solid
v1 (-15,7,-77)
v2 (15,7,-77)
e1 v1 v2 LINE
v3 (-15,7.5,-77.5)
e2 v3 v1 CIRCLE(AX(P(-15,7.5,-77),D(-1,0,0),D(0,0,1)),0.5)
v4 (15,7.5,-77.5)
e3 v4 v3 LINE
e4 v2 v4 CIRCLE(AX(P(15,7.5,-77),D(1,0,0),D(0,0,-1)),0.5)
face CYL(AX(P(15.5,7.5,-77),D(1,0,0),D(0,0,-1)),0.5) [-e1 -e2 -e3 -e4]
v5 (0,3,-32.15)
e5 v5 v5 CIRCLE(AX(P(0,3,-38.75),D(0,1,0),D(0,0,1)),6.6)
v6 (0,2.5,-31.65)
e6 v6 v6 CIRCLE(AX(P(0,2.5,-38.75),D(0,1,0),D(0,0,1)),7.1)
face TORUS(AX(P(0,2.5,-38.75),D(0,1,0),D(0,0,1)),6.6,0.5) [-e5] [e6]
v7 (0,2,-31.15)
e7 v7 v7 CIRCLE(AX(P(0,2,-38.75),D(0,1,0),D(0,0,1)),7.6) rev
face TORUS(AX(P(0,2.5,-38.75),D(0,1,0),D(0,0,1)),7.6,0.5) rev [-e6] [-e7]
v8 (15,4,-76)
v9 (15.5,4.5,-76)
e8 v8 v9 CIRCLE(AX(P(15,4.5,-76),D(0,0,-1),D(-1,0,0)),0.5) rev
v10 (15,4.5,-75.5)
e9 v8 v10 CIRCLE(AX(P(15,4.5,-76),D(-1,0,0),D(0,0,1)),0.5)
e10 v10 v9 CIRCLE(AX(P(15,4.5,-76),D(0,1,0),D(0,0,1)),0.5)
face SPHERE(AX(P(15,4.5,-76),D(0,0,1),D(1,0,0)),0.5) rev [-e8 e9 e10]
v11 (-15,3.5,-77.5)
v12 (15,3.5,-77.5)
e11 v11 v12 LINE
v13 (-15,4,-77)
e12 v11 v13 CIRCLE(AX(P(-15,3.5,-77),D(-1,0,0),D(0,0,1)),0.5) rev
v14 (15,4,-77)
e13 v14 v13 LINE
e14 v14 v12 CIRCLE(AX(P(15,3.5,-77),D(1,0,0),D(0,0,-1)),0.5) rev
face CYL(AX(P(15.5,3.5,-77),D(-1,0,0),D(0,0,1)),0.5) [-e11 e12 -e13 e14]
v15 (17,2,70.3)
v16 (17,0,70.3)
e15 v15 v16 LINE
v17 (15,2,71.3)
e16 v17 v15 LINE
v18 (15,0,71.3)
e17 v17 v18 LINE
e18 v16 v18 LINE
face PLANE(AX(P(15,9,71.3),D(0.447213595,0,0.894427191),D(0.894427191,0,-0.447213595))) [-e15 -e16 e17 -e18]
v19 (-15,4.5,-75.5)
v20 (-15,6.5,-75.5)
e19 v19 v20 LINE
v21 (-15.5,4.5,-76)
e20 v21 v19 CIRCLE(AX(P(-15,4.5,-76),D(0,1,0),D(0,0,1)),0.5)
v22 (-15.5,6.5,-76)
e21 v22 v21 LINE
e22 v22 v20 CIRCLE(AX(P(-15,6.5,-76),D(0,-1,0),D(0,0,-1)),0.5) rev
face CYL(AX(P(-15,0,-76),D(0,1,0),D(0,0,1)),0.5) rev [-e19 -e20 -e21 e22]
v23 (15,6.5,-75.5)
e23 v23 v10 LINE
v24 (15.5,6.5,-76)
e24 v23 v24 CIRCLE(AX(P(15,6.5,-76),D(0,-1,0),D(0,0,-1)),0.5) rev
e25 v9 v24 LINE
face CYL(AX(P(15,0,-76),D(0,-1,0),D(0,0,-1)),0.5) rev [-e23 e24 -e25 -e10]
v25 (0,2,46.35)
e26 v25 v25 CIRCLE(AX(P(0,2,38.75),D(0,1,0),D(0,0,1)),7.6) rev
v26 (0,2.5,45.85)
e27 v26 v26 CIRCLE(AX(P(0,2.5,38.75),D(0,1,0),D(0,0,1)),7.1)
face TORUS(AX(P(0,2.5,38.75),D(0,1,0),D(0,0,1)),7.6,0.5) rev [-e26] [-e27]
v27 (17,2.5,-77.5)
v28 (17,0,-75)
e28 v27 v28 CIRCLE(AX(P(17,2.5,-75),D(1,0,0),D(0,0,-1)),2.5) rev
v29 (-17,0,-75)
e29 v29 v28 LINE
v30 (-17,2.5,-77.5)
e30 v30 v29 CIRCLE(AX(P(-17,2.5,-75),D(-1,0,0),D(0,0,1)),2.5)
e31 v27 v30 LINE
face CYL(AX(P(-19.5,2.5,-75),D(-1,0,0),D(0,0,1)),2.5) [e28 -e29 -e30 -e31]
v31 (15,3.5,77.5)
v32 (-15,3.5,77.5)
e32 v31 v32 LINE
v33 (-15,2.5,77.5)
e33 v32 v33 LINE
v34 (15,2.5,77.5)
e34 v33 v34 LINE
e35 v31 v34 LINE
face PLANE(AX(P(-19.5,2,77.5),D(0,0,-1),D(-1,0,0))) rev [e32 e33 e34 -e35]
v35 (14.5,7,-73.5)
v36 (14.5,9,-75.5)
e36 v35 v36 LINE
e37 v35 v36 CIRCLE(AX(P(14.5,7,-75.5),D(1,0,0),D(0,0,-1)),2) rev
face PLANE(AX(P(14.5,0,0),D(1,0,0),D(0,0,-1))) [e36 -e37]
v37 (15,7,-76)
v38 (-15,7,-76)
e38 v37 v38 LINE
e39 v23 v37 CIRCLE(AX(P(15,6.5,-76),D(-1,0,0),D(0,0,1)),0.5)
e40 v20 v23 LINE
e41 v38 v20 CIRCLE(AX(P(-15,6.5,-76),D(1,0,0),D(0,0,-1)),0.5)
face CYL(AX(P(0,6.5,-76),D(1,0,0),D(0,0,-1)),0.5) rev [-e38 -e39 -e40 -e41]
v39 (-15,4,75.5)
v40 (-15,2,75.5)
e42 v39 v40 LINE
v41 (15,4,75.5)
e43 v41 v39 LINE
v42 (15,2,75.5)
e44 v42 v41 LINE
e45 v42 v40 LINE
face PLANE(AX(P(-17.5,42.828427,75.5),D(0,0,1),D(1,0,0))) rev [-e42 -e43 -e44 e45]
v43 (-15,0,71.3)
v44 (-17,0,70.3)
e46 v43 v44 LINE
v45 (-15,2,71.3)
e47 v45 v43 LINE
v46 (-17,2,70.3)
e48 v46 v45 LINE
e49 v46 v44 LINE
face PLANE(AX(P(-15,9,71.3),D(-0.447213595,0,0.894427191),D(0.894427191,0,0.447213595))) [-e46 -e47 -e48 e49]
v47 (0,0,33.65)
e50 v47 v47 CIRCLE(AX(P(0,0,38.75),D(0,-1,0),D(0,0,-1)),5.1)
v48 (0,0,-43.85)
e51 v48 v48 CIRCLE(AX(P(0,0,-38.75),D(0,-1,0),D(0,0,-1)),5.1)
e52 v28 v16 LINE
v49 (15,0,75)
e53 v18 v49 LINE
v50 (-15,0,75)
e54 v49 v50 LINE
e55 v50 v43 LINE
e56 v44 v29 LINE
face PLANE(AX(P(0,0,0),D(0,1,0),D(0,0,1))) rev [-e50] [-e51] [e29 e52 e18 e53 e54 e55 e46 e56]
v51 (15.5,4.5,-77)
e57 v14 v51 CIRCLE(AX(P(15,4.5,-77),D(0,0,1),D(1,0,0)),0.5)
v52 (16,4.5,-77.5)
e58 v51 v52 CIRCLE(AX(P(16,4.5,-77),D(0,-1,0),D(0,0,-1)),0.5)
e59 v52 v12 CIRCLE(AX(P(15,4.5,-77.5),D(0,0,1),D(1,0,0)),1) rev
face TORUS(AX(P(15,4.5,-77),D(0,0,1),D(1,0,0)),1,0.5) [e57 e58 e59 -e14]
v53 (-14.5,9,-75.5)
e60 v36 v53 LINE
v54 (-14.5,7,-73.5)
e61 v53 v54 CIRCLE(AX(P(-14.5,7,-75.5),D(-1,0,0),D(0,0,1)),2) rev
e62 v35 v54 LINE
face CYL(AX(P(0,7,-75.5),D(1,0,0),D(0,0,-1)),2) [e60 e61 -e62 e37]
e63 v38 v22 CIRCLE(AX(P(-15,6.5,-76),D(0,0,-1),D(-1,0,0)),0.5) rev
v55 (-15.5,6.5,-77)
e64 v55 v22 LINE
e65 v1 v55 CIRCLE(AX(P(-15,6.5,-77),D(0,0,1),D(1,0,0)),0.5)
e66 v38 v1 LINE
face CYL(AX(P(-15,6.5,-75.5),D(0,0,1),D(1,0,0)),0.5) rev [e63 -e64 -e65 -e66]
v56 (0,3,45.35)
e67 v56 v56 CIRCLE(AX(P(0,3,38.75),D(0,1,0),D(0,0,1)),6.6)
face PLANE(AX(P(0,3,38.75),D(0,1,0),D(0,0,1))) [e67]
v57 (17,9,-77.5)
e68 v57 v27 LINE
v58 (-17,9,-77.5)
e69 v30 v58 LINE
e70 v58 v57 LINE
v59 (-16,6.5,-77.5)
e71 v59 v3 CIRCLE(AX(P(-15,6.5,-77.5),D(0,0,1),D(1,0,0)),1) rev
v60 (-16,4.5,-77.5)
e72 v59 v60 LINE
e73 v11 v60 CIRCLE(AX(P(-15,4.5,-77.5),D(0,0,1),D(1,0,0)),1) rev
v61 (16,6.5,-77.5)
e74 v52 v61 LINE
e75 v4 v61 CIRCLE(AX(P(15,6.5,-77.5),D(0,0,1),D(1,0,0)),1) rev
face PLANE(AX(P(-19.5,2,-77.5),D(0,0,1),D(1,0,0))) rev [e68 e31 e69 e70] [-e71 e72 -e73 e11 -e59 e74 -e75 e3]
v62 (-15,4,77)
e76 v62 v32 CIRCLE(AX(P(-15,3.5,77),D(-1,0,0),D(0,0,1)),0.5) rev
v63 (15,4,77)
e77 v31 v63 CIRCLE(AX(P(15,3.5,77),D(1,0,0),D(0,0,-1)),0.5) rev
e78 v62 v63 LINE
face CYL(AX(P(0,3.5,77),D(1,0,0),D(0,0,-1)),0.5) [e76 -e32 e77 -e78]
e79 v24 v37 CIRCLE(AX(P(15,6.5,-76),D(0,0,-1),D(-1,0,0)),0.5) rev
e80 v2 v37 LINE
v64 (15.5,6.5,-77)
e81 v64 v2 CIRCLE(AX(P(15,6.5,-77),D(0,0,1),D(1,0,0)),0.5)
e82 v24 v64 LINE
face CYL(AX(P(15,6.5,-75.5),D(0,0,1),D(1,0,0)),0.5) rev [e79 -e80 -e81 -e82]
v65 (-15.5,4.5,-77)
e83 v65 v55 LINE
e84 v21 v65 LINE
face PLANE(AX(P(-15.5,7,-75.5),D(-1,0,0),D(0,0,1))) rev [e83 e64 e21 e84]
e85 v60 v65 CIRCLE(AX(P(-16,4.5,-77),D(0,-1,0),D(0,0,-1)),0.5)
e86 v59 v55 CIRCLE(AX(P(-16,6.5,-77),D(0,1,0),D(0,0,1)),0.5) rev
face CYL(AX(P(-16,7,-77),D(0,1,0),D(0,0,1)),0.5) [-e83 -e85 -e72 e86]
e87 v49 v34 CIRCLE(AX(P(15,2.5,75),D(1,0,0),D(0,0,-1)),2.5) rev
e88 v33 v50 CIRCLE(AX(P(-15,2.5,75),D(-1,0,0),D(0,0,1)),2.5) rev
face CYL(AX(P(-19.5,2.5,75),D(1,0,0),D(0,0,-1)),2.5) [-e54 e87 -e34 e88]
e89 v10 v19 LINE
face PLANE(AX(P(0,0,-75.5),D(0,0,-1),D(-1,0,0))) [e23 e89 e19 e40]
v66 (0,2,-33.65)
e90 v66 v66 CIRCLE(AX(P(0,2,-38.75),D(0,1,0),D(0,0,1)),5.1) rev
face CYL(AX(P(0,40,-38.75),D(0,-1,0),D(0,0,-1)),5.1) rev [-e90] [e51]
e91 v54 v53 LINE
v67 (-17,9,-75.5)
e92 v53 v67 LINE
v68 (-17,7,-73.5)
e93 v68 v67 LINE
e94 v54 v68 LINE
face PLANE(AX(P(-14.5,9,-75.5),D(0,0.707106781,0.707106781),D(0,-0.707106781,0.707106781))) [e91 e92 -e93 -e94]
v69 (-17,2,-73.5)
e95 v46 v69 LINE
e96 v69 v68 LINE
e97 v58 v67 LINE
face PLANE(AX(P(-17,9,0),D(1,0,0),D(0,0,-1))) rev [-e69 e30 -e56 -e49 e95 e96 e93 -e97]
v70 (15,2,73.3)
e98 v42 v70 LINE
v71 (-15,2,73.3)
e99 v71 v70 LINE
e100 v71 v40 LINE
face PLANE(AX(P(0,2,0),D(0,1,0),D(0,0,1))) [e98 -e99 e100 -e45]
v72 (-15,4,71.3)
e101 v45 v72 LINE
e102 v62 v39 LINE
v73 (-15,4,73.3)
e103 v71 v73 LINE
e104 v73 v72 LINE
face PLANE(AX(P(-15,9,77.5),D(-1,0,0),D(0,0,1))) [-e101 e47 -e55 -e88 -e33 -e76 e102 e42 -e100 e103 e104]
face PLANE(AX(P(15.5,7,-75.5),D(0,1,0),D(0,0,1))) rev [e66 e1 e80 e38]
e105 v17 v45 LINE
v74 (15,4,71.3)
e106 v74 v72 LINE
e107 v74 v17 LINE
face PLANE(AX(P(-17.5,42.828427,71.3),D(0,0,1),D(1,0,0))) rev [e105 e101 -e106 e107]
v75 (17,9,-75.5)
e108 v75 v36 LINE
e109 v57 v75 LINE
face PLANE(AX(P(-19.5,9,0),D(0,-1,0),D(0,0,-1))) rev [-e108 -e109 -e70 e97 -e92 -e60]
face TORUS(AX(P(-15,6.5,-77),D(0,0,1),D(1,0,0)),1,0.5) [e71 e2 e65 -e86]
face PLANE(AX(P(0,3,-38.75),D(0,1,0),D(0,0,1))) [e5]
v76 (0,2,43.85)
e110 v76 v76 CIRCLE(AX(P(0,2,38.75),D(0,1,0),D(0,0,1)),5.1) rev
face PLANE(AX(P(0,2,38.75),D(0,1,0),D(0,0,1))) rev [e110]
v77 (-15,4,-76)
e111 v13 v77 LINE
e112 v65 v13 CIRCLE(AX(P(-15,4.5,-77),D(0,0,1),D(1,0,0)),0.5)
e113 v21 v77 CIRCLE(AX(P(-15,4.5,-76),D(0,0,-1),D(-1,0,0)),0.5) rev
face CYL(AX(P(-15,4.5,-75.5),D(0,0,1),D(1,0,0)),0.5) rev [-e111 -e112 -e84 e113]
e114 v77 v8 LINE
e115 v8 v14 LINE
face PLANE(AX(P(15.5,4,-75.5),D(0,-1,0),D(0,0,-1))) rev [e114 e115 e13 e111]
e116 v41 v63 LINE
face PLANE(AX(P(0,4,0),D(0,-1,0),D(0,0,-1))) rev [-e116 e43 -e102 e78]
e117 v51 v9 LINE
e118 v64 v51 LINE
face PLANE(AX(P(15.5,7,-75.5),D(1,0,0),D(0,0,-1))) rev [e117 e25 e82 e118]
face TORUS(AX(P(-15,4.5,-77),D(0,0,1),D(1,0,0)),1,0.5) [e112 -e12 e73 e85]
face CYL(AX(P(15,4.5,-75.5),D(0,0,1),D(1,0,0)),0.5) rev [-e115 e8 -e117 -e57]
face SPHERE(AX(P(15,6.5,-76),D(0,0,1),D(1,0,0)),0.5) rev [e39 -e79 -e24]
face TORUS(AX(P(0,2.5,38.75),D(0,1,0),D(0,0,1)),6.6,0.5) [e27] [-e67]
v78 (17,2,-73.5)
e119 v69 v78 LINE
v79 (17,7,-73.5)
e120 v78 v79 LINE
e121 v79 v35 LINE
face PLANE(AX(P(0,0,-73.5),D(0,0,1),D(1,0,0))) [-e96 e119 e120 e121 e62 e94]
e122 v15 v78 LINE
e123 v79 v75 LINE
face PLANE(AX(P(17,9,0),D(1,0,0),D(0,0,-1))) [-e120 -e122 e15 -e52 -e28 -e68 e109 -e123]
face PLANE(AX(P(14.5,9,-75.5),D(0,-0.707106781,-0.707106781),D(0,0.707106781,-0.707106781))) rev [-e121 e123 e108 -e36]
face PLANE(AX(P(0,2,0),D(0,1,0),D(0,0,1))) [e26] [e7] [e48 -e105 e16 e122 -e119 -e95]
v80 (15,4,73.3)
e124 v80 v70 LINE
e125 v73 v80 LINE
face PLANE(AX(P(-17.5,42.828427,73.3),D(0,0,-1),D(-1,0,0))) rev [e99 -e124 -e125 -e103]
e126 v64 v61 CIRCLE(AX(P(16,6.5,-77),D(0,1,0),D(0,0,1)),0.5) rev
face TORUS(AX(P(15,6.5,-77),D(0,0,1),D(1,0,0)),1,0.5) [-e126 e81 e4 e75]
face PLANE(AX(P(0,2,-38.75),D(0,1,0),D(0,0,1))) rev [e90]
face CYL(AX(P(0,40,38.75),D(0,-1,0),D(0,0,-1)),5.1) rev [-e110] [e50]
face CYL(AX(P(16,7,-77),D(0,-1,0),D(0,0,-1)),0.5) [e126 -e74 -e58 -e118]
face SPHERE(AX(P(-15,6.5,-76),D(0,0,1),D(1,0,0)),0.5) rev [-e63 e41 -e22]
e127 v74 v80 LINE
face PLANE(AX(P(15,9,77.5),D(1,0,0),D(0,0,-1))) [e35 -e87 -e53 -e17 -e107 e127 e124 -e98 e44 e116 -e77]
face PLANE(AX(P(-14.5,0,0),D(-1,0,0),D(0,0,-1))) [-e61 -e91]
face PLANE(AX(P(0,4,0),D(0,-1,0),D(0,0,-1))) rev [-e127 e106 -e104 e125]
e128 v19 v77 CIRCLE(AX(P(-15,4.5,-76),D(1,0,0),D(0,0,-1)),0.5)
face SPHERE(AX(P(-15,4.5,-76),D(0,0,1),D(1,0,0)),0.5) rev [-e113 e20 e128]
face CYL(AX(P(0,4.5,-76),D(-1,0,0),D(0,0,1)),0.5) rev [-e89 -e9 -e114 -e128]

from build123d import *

# Parameters (mm, degrees)
SKETCH1_W                       = 39
SKETCH1_H                       = 155
BOSS_EXTRUDE1_DEPTH             = 2
BOSS_EXTRUDE2_DEPTH             = 38
SKETCH3_W                       = 2
SKETCH3_H                       = 2
BOSS_EXTRUDE3_DEPTH             = 38
SKETCH4_W                       = 2
SKETCH4_H                       = 2
BOSS_EXTRUDE4_DEPTH             = 151
SKETCH6_W                       = 35
SKETCH6_H                       = 2.2
CUT_EXTRUDE1_DEPTH              = 160.340045186
SKETCH7_W                       = 35
SKETCH7_H                       = 2.2
CUT_EXTRUDE2_DEPTH              = 89.490112442
SKETCH5_W                       = 31
SKETCH5_H                       = 2
BOSS_EXTRUDE5_DEPTH             = 2
BOSS_EXTRUDE6_REACH             = 91.367
SKETCH8_W                       = 2
SKETCH8_H                       = 2
BOSS_EXTRUDE6_DIRECTION_2_REACH = 91.367
SKETCH10_W                      = 2
SKETCH10_H                      = 2.2
SKETCH10_W_2                    = 2.2
SKETCH10_H_2                    = 2
BOSS_EXTRUDE8_DEPTH             = 2
SKETCH11_W                      = 2
SKETCH11_H                      = 2.2
SKETCH11_W_2                    = 2.2
SKETCH11_H_2                    = 2
BOSS_EXTRUDE9_DEPTH             = 2
FILLET2_R                       = 2.5
SKETCH14_W                      = 36.5
SKETCH14_H                      = 7.75
BOSS_EXTRUDE10_DEPTH            = 2
SKETCH13_W                      = 31
SKETCH13_H                      = 3
CUT_EXTRUDE4_DEPTH              = 2
FILLET3_R                       = 2
FILLET4_R                       = 0.5
SKETCH15_R                      = 5.1
CUT_EXTRUDE5_DEPTH              = 90.367219941
SKETCH16_R                      = 7.1
BOSS_EXTRUDE11_DEPTH            = 1
FILLET5_R                       = 0.5
CUT_EXTRUDE3_DEPTH              = 160.340045186
FILLET6_R                       = 0.4
FILLET7_R                       = 0.5
CUT_EXTRUDE8_DEPTH              = 90.367220028
CUT_EXTRUDE8_DEPTH_BACK         = 90.367220028
CUT_EXTRUDE11_DEPTH             = 81.420768473
CUT_EXTRUDE12_DEPTH             = 80.851424566
CUT_EXTRUDE13_DEPTH             = 2.5


with BuildPart() as part:
    # Sketch1 → Boss-Extrude1 (new body)
    with BuildSketch(Plane(origin=(0, 0, 0), x_dir=(1, 0, 0), z_dir=(0, 1, 0))):
        Rectangle(SKETCH1_W, SKETCH1_H)
    extrude(amount=BOSS_EXTRUDE1_DEPTH)

    # Sketch2 → Boss-Extrude2 (add)
    with BuildSketch(Plane(origin=(0, 2, 0), x_dir=(1, 0, 0), z_dir=(0, 1, 0))):
        Polygon((-17.5, -77.5), (-17.5, -75.5), (-17.5, 75.5), (17.5, 75.5), (17.5, -75.5), (17.5, -77.5), (19.5, -77.5), (19.5, 77.5), (-19.5, 77.5), (-19.5, -77.5), align=None)
    extrude(amount=BOSS_EXTRUDE2_DEPTH)

    # Sketch3 → Boss-Extrude3 (add)
    with BuildSketch(Plane(origin=(0, 2, 0), x_dir=(1, 0, 0), z_dir=(0, 1, 0))):
        with Locations((-16.5, -76.5)):
            Rectangle(SKETCH3_W, SKETCH3_H)
        with Locations((-16.5, -72.3)):
            Rectangle(SKETCH3_W, SKETCH3_H)
        with Locations((16.5, -76.5)):
            Rectangle(SKETCH3_W, SKETCH3_H)
        with Locations((16.5, -72.3)):
            Rectangle(SKETCH3_W, SKETCH3_H)
    extrude(amount=BOSS_EXTRUDE3_DEPTH)

    # Sketch4 → Boss-Extrude4 (add)
    with BuildSketch(Plane.XY.offset(-75.5)):
        with Locations((-16.5, 39)):
            Rectangle(SKETCH4_W, SKETCH4_H)
        Polygon((-15.5, 33.8), (-17.5, 31.8), (-17.5, 35.8), (-15.5, 35.8), align=None)
        Polygon((15.5, 35.8), (17.5, 35.8), (17.5, 31.8), (15.5, 33.8), align=None)
        with Locations((16.5, 39)):
            Rectangle(SKETCH4_W, SKETCH4_H)
    extrude(amount=BOSS_EXTRUDE4_DEPTH)

    # Sketch6 → Cut-Extrude1 (cut, through all)
    with BuildSketch(Plane.XY.offset(-75.5)):
        with Locations((0, 36.9)):
            Rectangle(SKETCH6_W, SKETCH6_H)
    extrude(amount=CUT_EXTRUDE1_DEPTH, mode=Mode.SUBTRACT)

    # Sketch7 → Cut-Extrude2 (cut, through all)
    with BuildSketch(Plane(origin=(0, 2, 0), x_dir=(1, 0, 0), z_dir=(0, 1, 0))):
        with Locations((0, -74.4)):
            Rectangle(SKETCH7_W, SKETCH7_H)
    extrude(amount=CUT_EXTRUDE2_DEPTH, mode=Mode.SUBTRACT)

    # Sketch5 → Boss-Extrude5 (add)
    with BuildSketch(Plane(origin=(0, 2, 0), x_dir=(1, 0, 0), z_dir=(0, 1, 0))):
        with Locations((0, -76.5)):
            Rectangle(SKETCH5_W, SKETCH5_H)
        with Locations((0, -72.3)):
            Rectangle(SKETCH5_W, SKETCH5_H)
    extrude(amount=BOSS_EXTRUDE5_DEPTH)

    # Boss-Extrude6: up to this face of the body (flat: up to its plane)
    boss_extrude6_end = Plane(part.part.faces().sort_by_distance((17.5, 16.9, -2.1))[0])
    # Sketch8 → Boss-Extrude6 (add, up to the picked face)
    with BuildSketch(Plane(origin=(0, 0, 0), x_dir=(0, 0, -1), z_dir=(1, 0, 0)), mode=Mode.PRIVATE) as boss_extrude6_sk1:
        with Locations((74.5, 39)):
            Rectangle(SKETCH8_W, SKETCH8_H)
    boss_extrude6_tool1 = split(extrude(boss_extrude6_sk1.sketch, amount=BOSS_EXTRUDE6_REACH, mode=Mode.PRIVATE), bisect_by=boss_extrude6_end, keep=Keep.BOTH, mode=Mode.PRIVATE)
    # Sketch8 → Boss-Extrude6 (add, up to the picked face)
    with BuildSketch(Plane(origin=(0, 0, 0), x_dir=(0, 0, -1), z_dir=(1, 0, 0)), mode=Mode.PRIVATE) as boss_extrude6_sk2:
        Polygon((75.5, 35.8), (73.5, 35.8), (73.5, 33.8), (75.5, 31.8), align=None)
    boss_extrude6_tool2 = split(extrude(boss_extrude6_sk2.sketch, amount=BOSS_EXTRUDE6_REACH, mode=Mode.PRIVATE), bisect_by=boss_extrude6_end, keep=Keep.BOTH, mode=Mode.PRIVATE)
    add(boss_extrude6_tool1.solids().sort_by(Axis((0, 39, -74.5), (1, 0, 0)))[0])
    add(boss_extrude6_tool2.solids().sort_by(Axis((0, 34.244444, -74.611111), (1, 0, 0)))[0])

    # Boss-Extrude6 direction 2: up to this face of the body (flat: up to its plane)
    boss_extrude6_direction_2_end = Plane(part.part.faces().sort_by_distance((-17.5, 16.9, -2.1))[0])
    # Sketch8 → Boss-Extrude6 direction 2 (add, up to the picked face)
    with BuildSketch(Plane(origin=(0, 0, 0), x_dir=(0, 0, -1), z_dir=(1, 0, 0)), mode=Mode.PRIVATE) as boss_extrude6_direction_2_sk1:
        with Locations((74.5, 39)):
            Rectangle(SKETCH8_W, SKETCH8_H)
    boss_extrude6_direction_2_tool1 = split(extrude(boss_extrude6_direction_2_sk1.sketch, amount=-BOSS_EXTRUDE6_DIRECTION_2_REACH, mode=Mode.PRIVATE), bisect_by=boss_extrude6_direction_2_end, keep=Keep.BOTH, mode=Mode.PRIVATE)
    # Sketch8 → Boss-Extrude6 direction 2 (add, up to the picked face)
    with BuildSketch(Plane(origin=(0, 0, 0), x_dir=(0, 0, -1), z_dir=(1, 0, 0)), mode=Mode.PRIVATE) as boss_extrude6_direction_2_sk2:
        Polygon((75.5, 35.8), (73.5, 35.8), (73.5, 33.8), (75.5, 31.8), align=None)
    boss_extrude6_direction_2_tool2 = split(extrude(boss_extrude6_direction_2_sk2.sketch, amount=-BOSS_EXTRUDE6_DIRECTION_2_REACH, mode=Mode.PRIVATE), bisect_by=boss_extrude6_direction_2_end, keep=Keep.BOTH, mode=Mode.PRIVATE)
    add(boss_extrude6_direction_2_tool1.solids().sort_by(Axis((0, 39, -74.5), (-1, 0, 0)))[0])
    add(boss_extrude6_direction_2_tool2.solids().sort_by(Axis((0, 34.244444, -74.611111), (-1, 0, 0)))[0])

    # Sketch10 → Boss-Extrude8 (add)
    with BuildSketch(Plane(origin=(-17.5, 0, 0), x_dir=(0, 0, -1), z_dir=(1, 0, 0))):
        with Locations((-76.5, 36.9)):
            Rectangle(SKETCH10_W, SKETCH10_H)
        with Locations((-74.4, 39)):
            Rectangle(SKETCH10_W_2, SKETCH10_H_2)
    extrude(amount=BOSS_EXTRUDE8_DEPTH)

    # Sketch11 → Boss-Extrude9 (add)
    with BuildSketch(Plane.ZY.offset(-17.5)):
        with Locations((76.5, 36.9)):
            Rectangle(SKETCH11_W, SKETCH11_H)
        with Locations((74.4, 39)):
            Rectangle(SKETCH11_W_2, SKETCH11_H_2)
    extrude(amount=BOSS_EXTRUDE9_DEPTH)

    # Fillet2
    fillet2_edges = [part.edges().sort_by_distance(p)[0] for p in [
        (-17.5, 16.9, 71.3),
        (17.5, 16.9, 71.3),
        (19.5, 20, 77.5),
        (-19.5, 20, 77.5),
        (-19.5, 20, -77.5),
        (-17.5, 16.9, -75.5),
        (17.5, 16.9, -75.5),
        (19.5, 20, -77.5),
        (19.5, 40, 0),
        (-19.5, 40, 0),
        (19.5, 0, 0),
        (-19.5, 0, 0),
        (0, 40, -77.5),
        (0, 0, 77.5),
        (0, 0, -77.5),
        (-17.5, 40, 77.5),
        (17.5, 40, 77.5),
    ]]
    fillet(fillet2_edges, radius=FILLET2_R)

    # Sketch14 → Boss-Extrude10 (add)
    with BuildSketch(Plane.XY.offset(-75.5)):
        with Locations((0, 5.125)):
            Rectangle(SKETCH14_W, SKETCH14_H)
    extrude(amount=BOSS_EXTRUDE10_DEPTH)

    # Sketch13 → Cut-Extrude4 (cut)
    with BuildSketch(Plane(origin=(0, 0, -77.5), x_dir=(-1, 0, 0), z_dir=(0, 0, -1))):
        with Locations((0, 5.5)):
            Rectangle(SKETCH13_W, SKETCH13_H)
    extrude(amount=-CUT_EXTRUDE4_DEPTH, mode=Mode.SUBTRACT)

    # Fillet3
    fillet3_edges = [part.edges().sort_by_distance(p)[0] for p in [
        (0, 9, -73.5),
    ]]
    fillet(fillet3_edges, radius=FILLET3_R - 0.0001)  # a hair under: the kernel refuses the full size

    # Fillet4
    fillet4_edges = [part.edges().sort_by_distance(p)[0] for p in [
        (15.5, 5.5, -75.5),
        (15.5, 4, -76.5),
        (0, 7, -75.5),
        (15.5, 7, -76.5),
        (-15.5, 5.5, -75.5),
        (-15.5, 7, -76.5),
        (0, 4, -75.5),
        (-15.5, 4, -76.5),
        (15.5, 5.5, -77.5),
        (0, 4, -77.5),
        (-15.5, 5.5, -77.5),
        (0, 7, -77.5),
    ]]
    fillet(fillet4_edges, radius=FILLET4_R)

    # Sketch15 → Cut-Extrude5 (cut, through all)
    with BuildSketch(Plane.XZ):
        with Locations(Location((0, 38.75, 0), (0, 0, 270))):
            Circle(SKETCH15_R)
        with Locations(Location((0, -38.75, 0), (0, 0, 270))):
            Circle(SKETCH15_R)
    extrude(amount=-CUT_EXTRUDE5_DEPTH, mode=Mode.SUBTRACT)

    # Sketch16 → Boss-Extrude11 (add)
    with BuildSketch(Plane(origin=(0, 2, 0), x_dir=(1, 0, 0), z_dir=(0, 1, 0))):
        with Locations(Location((0, 38.75, 0), (0, 0, 270))):
            Circle(SKETCH16_R)
        with Locations(Location((0, -38.75, 0), (0, 0, 270))):
            Circle(SKETCH16_R)
    extrude(amount=BOSS_EXTRUDE11_DEPTH)

    # Fillet5
    fillet5_edges = [part.edges().sort_by_distance(p)[0] for p in [
        (0, 2, -45.85),
        (0, 3, -45.85),
        (0, 2, 31.65),
        (0, 3, 31.65),
    ]]
    fillet(fillet5_edges, radius=FILLET5_R - 0.0001)  # a hair under: the kernel refuses the full size

    # Sketch12 → Cut-Extrude3 (cut, through all)
    with BuildSketch(Plane.XY.offset(-75.5)):
        with BuildLine():
            Line((1.668907005, 12.688040659), (2.22520934, 10.250720878))
            ThreePointArc((2.22520934, 10.250720878), (4.338837391, 10.990311321), (6.234898019, 12.181685175))
            Line((6.234898019, 12.181685175), (4.676173514, 14.136263881))
            ThreePointArc((4.676173514, 14.136263881), (3.254128043, 13.242733491), (1.668907005, 12.688040659))
        make_face()
        with BuildLine():
            ThreePointArc((-6.234898019, 12.181685175), (-4.338837391, 10.990311321), (-2.22520934, 10.250720878))
            Line((-2.22520934, 10.250720878), (-1.668907005, 12.688040659))
            ThreePointArc((-1.668907005, 12.688040659), (-3.254128043, 13.242733491), (-4.676173514, 14.136263881))
            Line((-4.676173514, 14.136263881), (-6.234898019, 12.181685175))
        make_face()
        with BuildLine():
            ThreePointArc((-10, 20), (-9.749279122, 17.77479066), (-9.009688679, 15.661162609))
            Line((-9.009688679, 15.661162609), (-6.757266509, 16.745871957))
            ThreePointArc((-6.757266509, 16.745871957), (-7.311959341, 18.331092995), (-7.5, 20))
            Line((-7.5, 20), (-10, 20))
        make_face()
        with BuildLine():
            ThreePointArc((-6.234898019, 27.818314825), (-7.818314825, 26.234898019), (-9.009688679, 24.338837391))
            Line((-9.009688679, 24.338837391), (-6.757266509, 23.254128043))
            ThreePointArc((-6.757266509, 23.254128043), (-5.863736119, 24.676173514), (-4.676173514, 25.863736119))
            Line((-4.676173514, 25.863736119), (-6.234898019, 27.818314825))
        make_face()
        with BuildLine():
            ThreePointArc((-1.668907005, 27.311959341), (-0.839733571, 27.452841574), (0, 27.5))
            Line((0, 27.5), (0, 30))
            ThreePointArc((0, 30), (-1.119644761, 29.937122099), (-2.22520934, 29.749279122))
            Line((-2.22520934, 29.749279122), (-1.668907005, 27.311959341))
        make_face()
        with BuildLine():
            Line((0, 30), (0, 27.5))
            ThreePointArc((0, 27.5), (0.839733571, 27.452841574), (1.668907005, 27.311959341))
            Line((1.668907005, 27.311959341), (2.22520934, 29.749279122))
            ThreePointArc((2.22520934, 29.749279122), (1.119644761, 29.937122099), (0, 30))
        make_face()
        with BuildLine():
            Line((6.757266509, 23.254128043), (9.009688679, 24.338837391))
            ThreePointArc((9.009688679, 24.338837391), (7.818314825, 26.234898019), (6.234898019, 27.818314825))
            Line((6.234898019, 27.818314825), (4.676173514, 25.863736119))
            ThreePointArc((4.676173514, 25.863736119), (5.863736119, 24.676173514), (6.757266509, 23.254128043))
        make_face()
        with BuildLine():
            Line((6.757266509, 16.745871957), (9.009688679, 15.661162609))
            ThreePointArc((9.009688679, 15.661162609), (9.749279122, 17.77479066), (10, 20))
            Line((10, 20), (7.5, 20))
            ThreePointArc((7.5, 20), (7.311959341, 18.331092995), (6.757266509, 16.745871957))
        make_face()
        with BuildLine():
            ThreePointArc((2.5, 20), (2.43731978, 19.443697665), (2.25242217, 18.915290652))
            Line((2.25242217, 18.915290652), (4.50484434, 17.830581304))
            ThreePointArc((4.50484434, 17.830581304), (4.874639561, 18.88739533), (5, 20))
            Line((5, 20), (2.5, 20))
        make_face()
        with BuildLine():
            ThreePointArc((1.558724505, 21.954578706), (1.954578706, 21.558724505), (2.25242217, 21.084709348))
            Line((2.25242217, 21.084709348), (4.50484434, 22.169418696))
            ThreePointArc((4.50484434, 22.169418696), (3.909157412, 23.117449009), (3.117449009, 23.909157412))
            Line((3.117449009, 23.909157412), (1.558724505, 21.954578706))
        make_face()
        with BuildLine():
            Line((0, 25), (0, 22.5))
            ThreePointArc((0, 22.5), (0.27991119, 22.484280525), (0.556302335, 22.43731978))
            Line((0.556302335, 22.43731978), (1.11260467, 24.874639561))
            ThreePointArc((1.11260467, 24.874639561), (0.559822381, 24.968561049), (0, 25))
        make_face()
        with BuildLine():
            ThreePointArc((-0.556302335, 22.43731978), (-0.27991119, 22.484280525), (0, 22.5))
            Line((0, 22.5), (0, 25))
            ThreePointArc((0, 25), (-0.559822381, 24.968561049), (-1.11260467, 24.874639561))
            Line((-1.11260467, 24.874639561), (-0.556302335, 22.43731978))
        make_face()
        with BuildLine():
            ThreePointArc((-2.25242217, 21.084709348), (-1.954578706, 21.558724505), (-1.558724505, 21.954578706))
            Line((-1.558724505, 21.954578706), (-3.117449009, 23.909157412))
            ThreePointArc((-3.117449009, 23.909157412), (-3.909157412, 23.117449009), (-4.50484434, 22.169418696))
            Line((-4.50484434, 22.169418696), (-2.25242217, 21.084709348))
        make_face()
        with BuildLine():
            ThreePointArc((-2.25242217, 18.915290652), (-2.43731978, 19.443697665), (-2.5, 20))
            Line((-2.5, 20), (-5, 20))
            ThreePointArc((-5, 20), (-4.874639561, 18.88739533), (-4.50484434, 17.830581304))
            Line((-4.50484434, 17.830581304), (-2.25242217, 18.915290652))
        make_face()
        with BuildLine():
            ThreePointArc((-3.117449009, 16.090842588), (-2.169418696, 15.49515566), (-1.11260467, 15.125360439))
            Line((-1.11260467, 15.125360439), (-0.556302335, 17.56268022))
            ThreePointArc((-0.556302335, 17.56268022), (-1.084709348, 17.74757783), (-1.558724505, 18.045421294))
            Line((-1.558724505, 18.045421294), (-3.117449009, 16.090842588))
        make_face()
        with BuildLine():
            Line((0.556302335, 17.56268022), (1.11260467, 15.125360439))
            ThreePointArc((1.11260467, 15.125360439), (2.169418696, 15.49515566), (3.117449009, 16.090842588))
            Line((3.117449009, 16.090842588), (1.558724505, 18.045421294))
            ThreePointArc((1.558724505, 18.045421294), (1.084709348, 17.74757783), (0.556302335, 17.56268022))
        make_face()
    extrude(amount=-CUT_EXTRUDE3_DEPTH, mode=Mode.SUBTRACT)

    # Fillet6
    fillet6_edges = [part.edges().sort_by_distance(p)[0] for p in [
        (5.863736119, 24.676173514, -75.5),
        (5.455535766, 26.841025472, -75.5),
        (7.818314825, 26.234898019, -77.5),
        (7.883477594, 23.796482717, -77.5),
        (5.863736119, 24.676173514, -77.5),
        (5.455535766, 26.841025472, -77.5),
        (7.883477594, 23.796482717, -75.5),
        (7.818314825, 26.234898019, -75.5),
        (7.311959341, 18.331092995, -75.5),
        (8.75, 20, -75.5),
        (9.749279122, 17.77479066, -77.5),
        (7.883477594, 16.203517283, -77.5),
        (7.311959341, 18.331092995, -77.5),
        (8.75, 20, -77.5),
        (7.883477594, 16.203517283, -75.5),
        (9.749279122, 17.77479066, -75.5),
        (2.43731978, 19.443697665, -75.5),
        (3.75, 20, -75.5),
        (4.874639561, 18.88739533, -77.5),
        (3.378633255, 18.372935978, -77.5),
        (2.43731978, 19.443697665, -77.5),
        (3.75, 20, -77.5),
        (3.378633255, 18.372935978, -75.5),
        (4.874639561, 18.88739533, -75.5),
        (1.954578706, 21.558724505, -75.5),
        (2.338086757, 22.931868059, -75.5),
        (3.909157412, 23.117449009, -77.5),
        (3.378633255, 21.627064022, -77.5),
        (1.954578706, 21.558724505, -77.5),
        (2.338086757, 22.931868059, -77.5),
        (3.378633255, 21.627064022, -75.5),
        (3.909157412, 23.117449009, -75.5),
        (0, 27.5, -75.5),
        (-1.947058172, 28.530619232, -75.5),
        (0, 30, -77.5),
        (1.947058172, 28.530619232, -77.5),
        (0, 27.5, -77.5),
        (-1.947058172, 28.530619232, -77.5),
        (1.947058172, 28.530619232, -75.5),
        (0, 30, -75.5),
        (-5.863736119, 24.676173514, -75.5),
        (-7.883477594, 23.796482717, -75.5),
        (-7.818314825, 26.234898019, -77.5),
        (-5.455535766, 26.841025472, -77.5),
        (-5.863736119, 24.676173514, -77.5),
        (-7.883477594, 23.796482717, -77.5),
        (-5.455535766, 26.841025472, -75.5),
        (-7.818314825, 26.234898019, -75.5),
        (-7.311959341, 18.331092995, -75.5),
        (-7.883477594, 16.203517283, -75.5),
        (-9.749279122, 17.77479066, -77.5),
        (-8.75, 20, -77.5),
        (-7.311959341, 18.331092995, -77.5),
        (-7.883477594, 16.203517283, -77.5),
        (-8.75, 20, -75.5),
        (-9.749279122, 17.77479066, -75.5),
        (-3.254128043, 13.242733491, -75.5),
        (-1.947058172, 11.469380768, -75.5),
        (-4.338837391, 10.990311321, -77.5),
        (-5.455535766, 13.158974528, -77.5),
        (-3.254128043, 13.242733491, -77.5),
        (-1.947058172, 11.469380768, -77.5),
        (-5.455535766, 13.158974528, -75.5),
        (-4.338837391, 10.990311321, -75.5),
        (1.084709348, 17.74757783, -75.5),
        (2.338086757, 17.068131941, -75.5),
        (2.169418696, 15.49515566, -77.5),
        (0.834453502, 16.344020329, -77.5),
        (1.084709348, 17.74757783, -77.5),
        (2.338086757, 17.068131941, -77.5),
        (0.834453502, 16.344020329, -75.5),
        (2.169418696, 15.49515566, -75.5),
        (-2.43731978, 19.443697665, -75.5),
        (-3.378633255, 18.372935978, -75.5),
        (-4.874639561, 18.88739533, -77.5),
        (-3.75, 20, -77.5),
        (-2.43731978, 19.443697665, -77.5),
        (-3.378633255, 18.372935978, -77.5),
        (-3.75, 20, -75.5),
        (-4.874639561, 18.88739533, -75.5),
        (-1.084709348, 17.74757783, -75.5),
        (-0.834453502, 16.344020329, -75.5),
        (-2.169418696, 15.49515566, -77.5),
        (-2.338086757, 17.068131941, -77.5),
        (-1.084709348, 17.74757783, -77.5),
        (-0.834453502, 16.344020329, -77.5),
        (-2.338086757, 17.068131941, -75.5),
        (-2.169418696, 15.49515566, -75.5),
        (-1.954578706, 21.558724505, -75.5),
        (-3.378633255, 21.627064022, -75.5),
        (-3.909157412, 23.117449009, -77.5),
        (-2.338086757, 22.931868059, -77.5),
        (-1.954578706, 21.558724505, -77.5),
        (-3.378633255, 21.627064022, -77.5),
        (-2.338086757, 22.931868059, -75.5),
        (-3.909157412, 23.117449009, -75.5),
        (0, 25, -77.5),
        (0.834453502, 23.655979671, -77.5),
        (0, 22.5, -75.5),
        (-0.834453502, 23.655979671, -75.5),
        (0, 22.5, -77.5),
        (-0.834453502, 23.655979671, -77.5),
        (0, 25, -75.5),
        (0.834453502, 23.655979671, -75.5),
        (3.254128043, 13.242733491, -75.5),
        (5.455535766, 13.158974528, -75.5),
        (4.338837391, 10.990311321, -77.5),
        (1.947058172, 11.469380768, -77.5),
        (3.254128043, 13.242733491, -77.5),
        (5.455535766, 13.158974528, -77.5),
        (1.947058172, 11.469380768, -75.5),
        (4.338837391, 10.990311321, -75.5),
    ]]
    fillet(fillet6_edges, radius=FILLET6_R)

    # Fillet7
    fillet7_edges = [part.edges().sort_by_distance(p)[0] for p in [
        (15.5, 40, 0.75),
        (0, 4, 77.5),
        (0, 40, -73.5),
        (-15.5, 40, 0.75),
        (-15.5, 20.75, 77.5),
        (-15.5, 39.267766953, 76.767766953),
        (15.5, 20.75, 77.5),
        (15.5, 39.267766953, 76.767766953),
    ]]
    fillet(fillet7_edges, radius=FILLET7_R)

    # Sketch20 → Cut-Extrude8 (cut, two sides: drawn at the far end of the back side and taken through both)
    with BuildSketch(Plane(origin=(0, 0, 0), x_dir=(0, 0, -1), z_dir=(1, 0, 0)).offset(-CUT_EXTRUDE8_DEPTH_BACK)):
        Polygon((77.5, 40), (77.5, 9), (75.5, 9), (73.5, 9), (73.5, 4), (-75.5, 4), (-77.5, 4), (-77.5, 40), align=None)
    extrude(amount=CUT_EXTRUDE8_DEPTH + CUT_EXTRUDE8_DEPTH_BACK, mode=Mode.SUBTRACT)

    # Sketch21 → Cut-Extrude11 (cut, through all)
    with BuildSketch(Plane(origin=(0, 0, 0), x_dir=(1, 0, 0), z_dir=(0, 1, 0))):
        Polygon((17, 77.5), (17, 73.5), (17, -77.5), (19.5, -77.5), (19.5, 77.5), align=None)
        Polygon((-17, 77.5), (-17, 73.5), (-17, -77.5), (-19.5, -77.5), (-19.5, 77.5), align=None)
    extrude(amount=CUT_EXTRUDE11_DEPTH, mode=Mode.SUBTRACT)

    # Sketch24 → Cut-Extrude12 (cut, through all)
    with BuildSketch(Plane(origin=(0, 0, 0), x_dir=(1, 0, 0), z_dir=(0, 1, 0))):
        Polygon((17, -77.5), (15, -77.5), (15, -71.3), (17, -70.3), align=None)
        Polygon((-17, -70.3), (-17, -77.5), (-15, -77.5), (-15, -71.3), align=None)
    extrude(amount=CUT_EXTRUDE12_DEPTH, mode=Mode.SUBTRACT)

    # Sketch26 → Cut-Extrude13 (cut)
    with BuildSketch(Plane(origin=(17, 0, 0), x_dir=(0, 0, -1), z_dir=(1, 0, 0))):
        Polygon((75.5, 9), (73.5, 7), (73.5, 9), align=None)
    cut_extrude13 = extrude(amount=-CUT_EXTRUDE13_DEPTH, mode=Mode.SUBTRACT)

    # Mirror1: Cut-Extrude13 across plane
    add(cut_extrude13.mirror(Plane(origin=(0, 0, 0), x_dir=(0, 0, 1), z_dir=(1, 0, 0))), mode=Mode.SUBTRACT)


solid = part.part
